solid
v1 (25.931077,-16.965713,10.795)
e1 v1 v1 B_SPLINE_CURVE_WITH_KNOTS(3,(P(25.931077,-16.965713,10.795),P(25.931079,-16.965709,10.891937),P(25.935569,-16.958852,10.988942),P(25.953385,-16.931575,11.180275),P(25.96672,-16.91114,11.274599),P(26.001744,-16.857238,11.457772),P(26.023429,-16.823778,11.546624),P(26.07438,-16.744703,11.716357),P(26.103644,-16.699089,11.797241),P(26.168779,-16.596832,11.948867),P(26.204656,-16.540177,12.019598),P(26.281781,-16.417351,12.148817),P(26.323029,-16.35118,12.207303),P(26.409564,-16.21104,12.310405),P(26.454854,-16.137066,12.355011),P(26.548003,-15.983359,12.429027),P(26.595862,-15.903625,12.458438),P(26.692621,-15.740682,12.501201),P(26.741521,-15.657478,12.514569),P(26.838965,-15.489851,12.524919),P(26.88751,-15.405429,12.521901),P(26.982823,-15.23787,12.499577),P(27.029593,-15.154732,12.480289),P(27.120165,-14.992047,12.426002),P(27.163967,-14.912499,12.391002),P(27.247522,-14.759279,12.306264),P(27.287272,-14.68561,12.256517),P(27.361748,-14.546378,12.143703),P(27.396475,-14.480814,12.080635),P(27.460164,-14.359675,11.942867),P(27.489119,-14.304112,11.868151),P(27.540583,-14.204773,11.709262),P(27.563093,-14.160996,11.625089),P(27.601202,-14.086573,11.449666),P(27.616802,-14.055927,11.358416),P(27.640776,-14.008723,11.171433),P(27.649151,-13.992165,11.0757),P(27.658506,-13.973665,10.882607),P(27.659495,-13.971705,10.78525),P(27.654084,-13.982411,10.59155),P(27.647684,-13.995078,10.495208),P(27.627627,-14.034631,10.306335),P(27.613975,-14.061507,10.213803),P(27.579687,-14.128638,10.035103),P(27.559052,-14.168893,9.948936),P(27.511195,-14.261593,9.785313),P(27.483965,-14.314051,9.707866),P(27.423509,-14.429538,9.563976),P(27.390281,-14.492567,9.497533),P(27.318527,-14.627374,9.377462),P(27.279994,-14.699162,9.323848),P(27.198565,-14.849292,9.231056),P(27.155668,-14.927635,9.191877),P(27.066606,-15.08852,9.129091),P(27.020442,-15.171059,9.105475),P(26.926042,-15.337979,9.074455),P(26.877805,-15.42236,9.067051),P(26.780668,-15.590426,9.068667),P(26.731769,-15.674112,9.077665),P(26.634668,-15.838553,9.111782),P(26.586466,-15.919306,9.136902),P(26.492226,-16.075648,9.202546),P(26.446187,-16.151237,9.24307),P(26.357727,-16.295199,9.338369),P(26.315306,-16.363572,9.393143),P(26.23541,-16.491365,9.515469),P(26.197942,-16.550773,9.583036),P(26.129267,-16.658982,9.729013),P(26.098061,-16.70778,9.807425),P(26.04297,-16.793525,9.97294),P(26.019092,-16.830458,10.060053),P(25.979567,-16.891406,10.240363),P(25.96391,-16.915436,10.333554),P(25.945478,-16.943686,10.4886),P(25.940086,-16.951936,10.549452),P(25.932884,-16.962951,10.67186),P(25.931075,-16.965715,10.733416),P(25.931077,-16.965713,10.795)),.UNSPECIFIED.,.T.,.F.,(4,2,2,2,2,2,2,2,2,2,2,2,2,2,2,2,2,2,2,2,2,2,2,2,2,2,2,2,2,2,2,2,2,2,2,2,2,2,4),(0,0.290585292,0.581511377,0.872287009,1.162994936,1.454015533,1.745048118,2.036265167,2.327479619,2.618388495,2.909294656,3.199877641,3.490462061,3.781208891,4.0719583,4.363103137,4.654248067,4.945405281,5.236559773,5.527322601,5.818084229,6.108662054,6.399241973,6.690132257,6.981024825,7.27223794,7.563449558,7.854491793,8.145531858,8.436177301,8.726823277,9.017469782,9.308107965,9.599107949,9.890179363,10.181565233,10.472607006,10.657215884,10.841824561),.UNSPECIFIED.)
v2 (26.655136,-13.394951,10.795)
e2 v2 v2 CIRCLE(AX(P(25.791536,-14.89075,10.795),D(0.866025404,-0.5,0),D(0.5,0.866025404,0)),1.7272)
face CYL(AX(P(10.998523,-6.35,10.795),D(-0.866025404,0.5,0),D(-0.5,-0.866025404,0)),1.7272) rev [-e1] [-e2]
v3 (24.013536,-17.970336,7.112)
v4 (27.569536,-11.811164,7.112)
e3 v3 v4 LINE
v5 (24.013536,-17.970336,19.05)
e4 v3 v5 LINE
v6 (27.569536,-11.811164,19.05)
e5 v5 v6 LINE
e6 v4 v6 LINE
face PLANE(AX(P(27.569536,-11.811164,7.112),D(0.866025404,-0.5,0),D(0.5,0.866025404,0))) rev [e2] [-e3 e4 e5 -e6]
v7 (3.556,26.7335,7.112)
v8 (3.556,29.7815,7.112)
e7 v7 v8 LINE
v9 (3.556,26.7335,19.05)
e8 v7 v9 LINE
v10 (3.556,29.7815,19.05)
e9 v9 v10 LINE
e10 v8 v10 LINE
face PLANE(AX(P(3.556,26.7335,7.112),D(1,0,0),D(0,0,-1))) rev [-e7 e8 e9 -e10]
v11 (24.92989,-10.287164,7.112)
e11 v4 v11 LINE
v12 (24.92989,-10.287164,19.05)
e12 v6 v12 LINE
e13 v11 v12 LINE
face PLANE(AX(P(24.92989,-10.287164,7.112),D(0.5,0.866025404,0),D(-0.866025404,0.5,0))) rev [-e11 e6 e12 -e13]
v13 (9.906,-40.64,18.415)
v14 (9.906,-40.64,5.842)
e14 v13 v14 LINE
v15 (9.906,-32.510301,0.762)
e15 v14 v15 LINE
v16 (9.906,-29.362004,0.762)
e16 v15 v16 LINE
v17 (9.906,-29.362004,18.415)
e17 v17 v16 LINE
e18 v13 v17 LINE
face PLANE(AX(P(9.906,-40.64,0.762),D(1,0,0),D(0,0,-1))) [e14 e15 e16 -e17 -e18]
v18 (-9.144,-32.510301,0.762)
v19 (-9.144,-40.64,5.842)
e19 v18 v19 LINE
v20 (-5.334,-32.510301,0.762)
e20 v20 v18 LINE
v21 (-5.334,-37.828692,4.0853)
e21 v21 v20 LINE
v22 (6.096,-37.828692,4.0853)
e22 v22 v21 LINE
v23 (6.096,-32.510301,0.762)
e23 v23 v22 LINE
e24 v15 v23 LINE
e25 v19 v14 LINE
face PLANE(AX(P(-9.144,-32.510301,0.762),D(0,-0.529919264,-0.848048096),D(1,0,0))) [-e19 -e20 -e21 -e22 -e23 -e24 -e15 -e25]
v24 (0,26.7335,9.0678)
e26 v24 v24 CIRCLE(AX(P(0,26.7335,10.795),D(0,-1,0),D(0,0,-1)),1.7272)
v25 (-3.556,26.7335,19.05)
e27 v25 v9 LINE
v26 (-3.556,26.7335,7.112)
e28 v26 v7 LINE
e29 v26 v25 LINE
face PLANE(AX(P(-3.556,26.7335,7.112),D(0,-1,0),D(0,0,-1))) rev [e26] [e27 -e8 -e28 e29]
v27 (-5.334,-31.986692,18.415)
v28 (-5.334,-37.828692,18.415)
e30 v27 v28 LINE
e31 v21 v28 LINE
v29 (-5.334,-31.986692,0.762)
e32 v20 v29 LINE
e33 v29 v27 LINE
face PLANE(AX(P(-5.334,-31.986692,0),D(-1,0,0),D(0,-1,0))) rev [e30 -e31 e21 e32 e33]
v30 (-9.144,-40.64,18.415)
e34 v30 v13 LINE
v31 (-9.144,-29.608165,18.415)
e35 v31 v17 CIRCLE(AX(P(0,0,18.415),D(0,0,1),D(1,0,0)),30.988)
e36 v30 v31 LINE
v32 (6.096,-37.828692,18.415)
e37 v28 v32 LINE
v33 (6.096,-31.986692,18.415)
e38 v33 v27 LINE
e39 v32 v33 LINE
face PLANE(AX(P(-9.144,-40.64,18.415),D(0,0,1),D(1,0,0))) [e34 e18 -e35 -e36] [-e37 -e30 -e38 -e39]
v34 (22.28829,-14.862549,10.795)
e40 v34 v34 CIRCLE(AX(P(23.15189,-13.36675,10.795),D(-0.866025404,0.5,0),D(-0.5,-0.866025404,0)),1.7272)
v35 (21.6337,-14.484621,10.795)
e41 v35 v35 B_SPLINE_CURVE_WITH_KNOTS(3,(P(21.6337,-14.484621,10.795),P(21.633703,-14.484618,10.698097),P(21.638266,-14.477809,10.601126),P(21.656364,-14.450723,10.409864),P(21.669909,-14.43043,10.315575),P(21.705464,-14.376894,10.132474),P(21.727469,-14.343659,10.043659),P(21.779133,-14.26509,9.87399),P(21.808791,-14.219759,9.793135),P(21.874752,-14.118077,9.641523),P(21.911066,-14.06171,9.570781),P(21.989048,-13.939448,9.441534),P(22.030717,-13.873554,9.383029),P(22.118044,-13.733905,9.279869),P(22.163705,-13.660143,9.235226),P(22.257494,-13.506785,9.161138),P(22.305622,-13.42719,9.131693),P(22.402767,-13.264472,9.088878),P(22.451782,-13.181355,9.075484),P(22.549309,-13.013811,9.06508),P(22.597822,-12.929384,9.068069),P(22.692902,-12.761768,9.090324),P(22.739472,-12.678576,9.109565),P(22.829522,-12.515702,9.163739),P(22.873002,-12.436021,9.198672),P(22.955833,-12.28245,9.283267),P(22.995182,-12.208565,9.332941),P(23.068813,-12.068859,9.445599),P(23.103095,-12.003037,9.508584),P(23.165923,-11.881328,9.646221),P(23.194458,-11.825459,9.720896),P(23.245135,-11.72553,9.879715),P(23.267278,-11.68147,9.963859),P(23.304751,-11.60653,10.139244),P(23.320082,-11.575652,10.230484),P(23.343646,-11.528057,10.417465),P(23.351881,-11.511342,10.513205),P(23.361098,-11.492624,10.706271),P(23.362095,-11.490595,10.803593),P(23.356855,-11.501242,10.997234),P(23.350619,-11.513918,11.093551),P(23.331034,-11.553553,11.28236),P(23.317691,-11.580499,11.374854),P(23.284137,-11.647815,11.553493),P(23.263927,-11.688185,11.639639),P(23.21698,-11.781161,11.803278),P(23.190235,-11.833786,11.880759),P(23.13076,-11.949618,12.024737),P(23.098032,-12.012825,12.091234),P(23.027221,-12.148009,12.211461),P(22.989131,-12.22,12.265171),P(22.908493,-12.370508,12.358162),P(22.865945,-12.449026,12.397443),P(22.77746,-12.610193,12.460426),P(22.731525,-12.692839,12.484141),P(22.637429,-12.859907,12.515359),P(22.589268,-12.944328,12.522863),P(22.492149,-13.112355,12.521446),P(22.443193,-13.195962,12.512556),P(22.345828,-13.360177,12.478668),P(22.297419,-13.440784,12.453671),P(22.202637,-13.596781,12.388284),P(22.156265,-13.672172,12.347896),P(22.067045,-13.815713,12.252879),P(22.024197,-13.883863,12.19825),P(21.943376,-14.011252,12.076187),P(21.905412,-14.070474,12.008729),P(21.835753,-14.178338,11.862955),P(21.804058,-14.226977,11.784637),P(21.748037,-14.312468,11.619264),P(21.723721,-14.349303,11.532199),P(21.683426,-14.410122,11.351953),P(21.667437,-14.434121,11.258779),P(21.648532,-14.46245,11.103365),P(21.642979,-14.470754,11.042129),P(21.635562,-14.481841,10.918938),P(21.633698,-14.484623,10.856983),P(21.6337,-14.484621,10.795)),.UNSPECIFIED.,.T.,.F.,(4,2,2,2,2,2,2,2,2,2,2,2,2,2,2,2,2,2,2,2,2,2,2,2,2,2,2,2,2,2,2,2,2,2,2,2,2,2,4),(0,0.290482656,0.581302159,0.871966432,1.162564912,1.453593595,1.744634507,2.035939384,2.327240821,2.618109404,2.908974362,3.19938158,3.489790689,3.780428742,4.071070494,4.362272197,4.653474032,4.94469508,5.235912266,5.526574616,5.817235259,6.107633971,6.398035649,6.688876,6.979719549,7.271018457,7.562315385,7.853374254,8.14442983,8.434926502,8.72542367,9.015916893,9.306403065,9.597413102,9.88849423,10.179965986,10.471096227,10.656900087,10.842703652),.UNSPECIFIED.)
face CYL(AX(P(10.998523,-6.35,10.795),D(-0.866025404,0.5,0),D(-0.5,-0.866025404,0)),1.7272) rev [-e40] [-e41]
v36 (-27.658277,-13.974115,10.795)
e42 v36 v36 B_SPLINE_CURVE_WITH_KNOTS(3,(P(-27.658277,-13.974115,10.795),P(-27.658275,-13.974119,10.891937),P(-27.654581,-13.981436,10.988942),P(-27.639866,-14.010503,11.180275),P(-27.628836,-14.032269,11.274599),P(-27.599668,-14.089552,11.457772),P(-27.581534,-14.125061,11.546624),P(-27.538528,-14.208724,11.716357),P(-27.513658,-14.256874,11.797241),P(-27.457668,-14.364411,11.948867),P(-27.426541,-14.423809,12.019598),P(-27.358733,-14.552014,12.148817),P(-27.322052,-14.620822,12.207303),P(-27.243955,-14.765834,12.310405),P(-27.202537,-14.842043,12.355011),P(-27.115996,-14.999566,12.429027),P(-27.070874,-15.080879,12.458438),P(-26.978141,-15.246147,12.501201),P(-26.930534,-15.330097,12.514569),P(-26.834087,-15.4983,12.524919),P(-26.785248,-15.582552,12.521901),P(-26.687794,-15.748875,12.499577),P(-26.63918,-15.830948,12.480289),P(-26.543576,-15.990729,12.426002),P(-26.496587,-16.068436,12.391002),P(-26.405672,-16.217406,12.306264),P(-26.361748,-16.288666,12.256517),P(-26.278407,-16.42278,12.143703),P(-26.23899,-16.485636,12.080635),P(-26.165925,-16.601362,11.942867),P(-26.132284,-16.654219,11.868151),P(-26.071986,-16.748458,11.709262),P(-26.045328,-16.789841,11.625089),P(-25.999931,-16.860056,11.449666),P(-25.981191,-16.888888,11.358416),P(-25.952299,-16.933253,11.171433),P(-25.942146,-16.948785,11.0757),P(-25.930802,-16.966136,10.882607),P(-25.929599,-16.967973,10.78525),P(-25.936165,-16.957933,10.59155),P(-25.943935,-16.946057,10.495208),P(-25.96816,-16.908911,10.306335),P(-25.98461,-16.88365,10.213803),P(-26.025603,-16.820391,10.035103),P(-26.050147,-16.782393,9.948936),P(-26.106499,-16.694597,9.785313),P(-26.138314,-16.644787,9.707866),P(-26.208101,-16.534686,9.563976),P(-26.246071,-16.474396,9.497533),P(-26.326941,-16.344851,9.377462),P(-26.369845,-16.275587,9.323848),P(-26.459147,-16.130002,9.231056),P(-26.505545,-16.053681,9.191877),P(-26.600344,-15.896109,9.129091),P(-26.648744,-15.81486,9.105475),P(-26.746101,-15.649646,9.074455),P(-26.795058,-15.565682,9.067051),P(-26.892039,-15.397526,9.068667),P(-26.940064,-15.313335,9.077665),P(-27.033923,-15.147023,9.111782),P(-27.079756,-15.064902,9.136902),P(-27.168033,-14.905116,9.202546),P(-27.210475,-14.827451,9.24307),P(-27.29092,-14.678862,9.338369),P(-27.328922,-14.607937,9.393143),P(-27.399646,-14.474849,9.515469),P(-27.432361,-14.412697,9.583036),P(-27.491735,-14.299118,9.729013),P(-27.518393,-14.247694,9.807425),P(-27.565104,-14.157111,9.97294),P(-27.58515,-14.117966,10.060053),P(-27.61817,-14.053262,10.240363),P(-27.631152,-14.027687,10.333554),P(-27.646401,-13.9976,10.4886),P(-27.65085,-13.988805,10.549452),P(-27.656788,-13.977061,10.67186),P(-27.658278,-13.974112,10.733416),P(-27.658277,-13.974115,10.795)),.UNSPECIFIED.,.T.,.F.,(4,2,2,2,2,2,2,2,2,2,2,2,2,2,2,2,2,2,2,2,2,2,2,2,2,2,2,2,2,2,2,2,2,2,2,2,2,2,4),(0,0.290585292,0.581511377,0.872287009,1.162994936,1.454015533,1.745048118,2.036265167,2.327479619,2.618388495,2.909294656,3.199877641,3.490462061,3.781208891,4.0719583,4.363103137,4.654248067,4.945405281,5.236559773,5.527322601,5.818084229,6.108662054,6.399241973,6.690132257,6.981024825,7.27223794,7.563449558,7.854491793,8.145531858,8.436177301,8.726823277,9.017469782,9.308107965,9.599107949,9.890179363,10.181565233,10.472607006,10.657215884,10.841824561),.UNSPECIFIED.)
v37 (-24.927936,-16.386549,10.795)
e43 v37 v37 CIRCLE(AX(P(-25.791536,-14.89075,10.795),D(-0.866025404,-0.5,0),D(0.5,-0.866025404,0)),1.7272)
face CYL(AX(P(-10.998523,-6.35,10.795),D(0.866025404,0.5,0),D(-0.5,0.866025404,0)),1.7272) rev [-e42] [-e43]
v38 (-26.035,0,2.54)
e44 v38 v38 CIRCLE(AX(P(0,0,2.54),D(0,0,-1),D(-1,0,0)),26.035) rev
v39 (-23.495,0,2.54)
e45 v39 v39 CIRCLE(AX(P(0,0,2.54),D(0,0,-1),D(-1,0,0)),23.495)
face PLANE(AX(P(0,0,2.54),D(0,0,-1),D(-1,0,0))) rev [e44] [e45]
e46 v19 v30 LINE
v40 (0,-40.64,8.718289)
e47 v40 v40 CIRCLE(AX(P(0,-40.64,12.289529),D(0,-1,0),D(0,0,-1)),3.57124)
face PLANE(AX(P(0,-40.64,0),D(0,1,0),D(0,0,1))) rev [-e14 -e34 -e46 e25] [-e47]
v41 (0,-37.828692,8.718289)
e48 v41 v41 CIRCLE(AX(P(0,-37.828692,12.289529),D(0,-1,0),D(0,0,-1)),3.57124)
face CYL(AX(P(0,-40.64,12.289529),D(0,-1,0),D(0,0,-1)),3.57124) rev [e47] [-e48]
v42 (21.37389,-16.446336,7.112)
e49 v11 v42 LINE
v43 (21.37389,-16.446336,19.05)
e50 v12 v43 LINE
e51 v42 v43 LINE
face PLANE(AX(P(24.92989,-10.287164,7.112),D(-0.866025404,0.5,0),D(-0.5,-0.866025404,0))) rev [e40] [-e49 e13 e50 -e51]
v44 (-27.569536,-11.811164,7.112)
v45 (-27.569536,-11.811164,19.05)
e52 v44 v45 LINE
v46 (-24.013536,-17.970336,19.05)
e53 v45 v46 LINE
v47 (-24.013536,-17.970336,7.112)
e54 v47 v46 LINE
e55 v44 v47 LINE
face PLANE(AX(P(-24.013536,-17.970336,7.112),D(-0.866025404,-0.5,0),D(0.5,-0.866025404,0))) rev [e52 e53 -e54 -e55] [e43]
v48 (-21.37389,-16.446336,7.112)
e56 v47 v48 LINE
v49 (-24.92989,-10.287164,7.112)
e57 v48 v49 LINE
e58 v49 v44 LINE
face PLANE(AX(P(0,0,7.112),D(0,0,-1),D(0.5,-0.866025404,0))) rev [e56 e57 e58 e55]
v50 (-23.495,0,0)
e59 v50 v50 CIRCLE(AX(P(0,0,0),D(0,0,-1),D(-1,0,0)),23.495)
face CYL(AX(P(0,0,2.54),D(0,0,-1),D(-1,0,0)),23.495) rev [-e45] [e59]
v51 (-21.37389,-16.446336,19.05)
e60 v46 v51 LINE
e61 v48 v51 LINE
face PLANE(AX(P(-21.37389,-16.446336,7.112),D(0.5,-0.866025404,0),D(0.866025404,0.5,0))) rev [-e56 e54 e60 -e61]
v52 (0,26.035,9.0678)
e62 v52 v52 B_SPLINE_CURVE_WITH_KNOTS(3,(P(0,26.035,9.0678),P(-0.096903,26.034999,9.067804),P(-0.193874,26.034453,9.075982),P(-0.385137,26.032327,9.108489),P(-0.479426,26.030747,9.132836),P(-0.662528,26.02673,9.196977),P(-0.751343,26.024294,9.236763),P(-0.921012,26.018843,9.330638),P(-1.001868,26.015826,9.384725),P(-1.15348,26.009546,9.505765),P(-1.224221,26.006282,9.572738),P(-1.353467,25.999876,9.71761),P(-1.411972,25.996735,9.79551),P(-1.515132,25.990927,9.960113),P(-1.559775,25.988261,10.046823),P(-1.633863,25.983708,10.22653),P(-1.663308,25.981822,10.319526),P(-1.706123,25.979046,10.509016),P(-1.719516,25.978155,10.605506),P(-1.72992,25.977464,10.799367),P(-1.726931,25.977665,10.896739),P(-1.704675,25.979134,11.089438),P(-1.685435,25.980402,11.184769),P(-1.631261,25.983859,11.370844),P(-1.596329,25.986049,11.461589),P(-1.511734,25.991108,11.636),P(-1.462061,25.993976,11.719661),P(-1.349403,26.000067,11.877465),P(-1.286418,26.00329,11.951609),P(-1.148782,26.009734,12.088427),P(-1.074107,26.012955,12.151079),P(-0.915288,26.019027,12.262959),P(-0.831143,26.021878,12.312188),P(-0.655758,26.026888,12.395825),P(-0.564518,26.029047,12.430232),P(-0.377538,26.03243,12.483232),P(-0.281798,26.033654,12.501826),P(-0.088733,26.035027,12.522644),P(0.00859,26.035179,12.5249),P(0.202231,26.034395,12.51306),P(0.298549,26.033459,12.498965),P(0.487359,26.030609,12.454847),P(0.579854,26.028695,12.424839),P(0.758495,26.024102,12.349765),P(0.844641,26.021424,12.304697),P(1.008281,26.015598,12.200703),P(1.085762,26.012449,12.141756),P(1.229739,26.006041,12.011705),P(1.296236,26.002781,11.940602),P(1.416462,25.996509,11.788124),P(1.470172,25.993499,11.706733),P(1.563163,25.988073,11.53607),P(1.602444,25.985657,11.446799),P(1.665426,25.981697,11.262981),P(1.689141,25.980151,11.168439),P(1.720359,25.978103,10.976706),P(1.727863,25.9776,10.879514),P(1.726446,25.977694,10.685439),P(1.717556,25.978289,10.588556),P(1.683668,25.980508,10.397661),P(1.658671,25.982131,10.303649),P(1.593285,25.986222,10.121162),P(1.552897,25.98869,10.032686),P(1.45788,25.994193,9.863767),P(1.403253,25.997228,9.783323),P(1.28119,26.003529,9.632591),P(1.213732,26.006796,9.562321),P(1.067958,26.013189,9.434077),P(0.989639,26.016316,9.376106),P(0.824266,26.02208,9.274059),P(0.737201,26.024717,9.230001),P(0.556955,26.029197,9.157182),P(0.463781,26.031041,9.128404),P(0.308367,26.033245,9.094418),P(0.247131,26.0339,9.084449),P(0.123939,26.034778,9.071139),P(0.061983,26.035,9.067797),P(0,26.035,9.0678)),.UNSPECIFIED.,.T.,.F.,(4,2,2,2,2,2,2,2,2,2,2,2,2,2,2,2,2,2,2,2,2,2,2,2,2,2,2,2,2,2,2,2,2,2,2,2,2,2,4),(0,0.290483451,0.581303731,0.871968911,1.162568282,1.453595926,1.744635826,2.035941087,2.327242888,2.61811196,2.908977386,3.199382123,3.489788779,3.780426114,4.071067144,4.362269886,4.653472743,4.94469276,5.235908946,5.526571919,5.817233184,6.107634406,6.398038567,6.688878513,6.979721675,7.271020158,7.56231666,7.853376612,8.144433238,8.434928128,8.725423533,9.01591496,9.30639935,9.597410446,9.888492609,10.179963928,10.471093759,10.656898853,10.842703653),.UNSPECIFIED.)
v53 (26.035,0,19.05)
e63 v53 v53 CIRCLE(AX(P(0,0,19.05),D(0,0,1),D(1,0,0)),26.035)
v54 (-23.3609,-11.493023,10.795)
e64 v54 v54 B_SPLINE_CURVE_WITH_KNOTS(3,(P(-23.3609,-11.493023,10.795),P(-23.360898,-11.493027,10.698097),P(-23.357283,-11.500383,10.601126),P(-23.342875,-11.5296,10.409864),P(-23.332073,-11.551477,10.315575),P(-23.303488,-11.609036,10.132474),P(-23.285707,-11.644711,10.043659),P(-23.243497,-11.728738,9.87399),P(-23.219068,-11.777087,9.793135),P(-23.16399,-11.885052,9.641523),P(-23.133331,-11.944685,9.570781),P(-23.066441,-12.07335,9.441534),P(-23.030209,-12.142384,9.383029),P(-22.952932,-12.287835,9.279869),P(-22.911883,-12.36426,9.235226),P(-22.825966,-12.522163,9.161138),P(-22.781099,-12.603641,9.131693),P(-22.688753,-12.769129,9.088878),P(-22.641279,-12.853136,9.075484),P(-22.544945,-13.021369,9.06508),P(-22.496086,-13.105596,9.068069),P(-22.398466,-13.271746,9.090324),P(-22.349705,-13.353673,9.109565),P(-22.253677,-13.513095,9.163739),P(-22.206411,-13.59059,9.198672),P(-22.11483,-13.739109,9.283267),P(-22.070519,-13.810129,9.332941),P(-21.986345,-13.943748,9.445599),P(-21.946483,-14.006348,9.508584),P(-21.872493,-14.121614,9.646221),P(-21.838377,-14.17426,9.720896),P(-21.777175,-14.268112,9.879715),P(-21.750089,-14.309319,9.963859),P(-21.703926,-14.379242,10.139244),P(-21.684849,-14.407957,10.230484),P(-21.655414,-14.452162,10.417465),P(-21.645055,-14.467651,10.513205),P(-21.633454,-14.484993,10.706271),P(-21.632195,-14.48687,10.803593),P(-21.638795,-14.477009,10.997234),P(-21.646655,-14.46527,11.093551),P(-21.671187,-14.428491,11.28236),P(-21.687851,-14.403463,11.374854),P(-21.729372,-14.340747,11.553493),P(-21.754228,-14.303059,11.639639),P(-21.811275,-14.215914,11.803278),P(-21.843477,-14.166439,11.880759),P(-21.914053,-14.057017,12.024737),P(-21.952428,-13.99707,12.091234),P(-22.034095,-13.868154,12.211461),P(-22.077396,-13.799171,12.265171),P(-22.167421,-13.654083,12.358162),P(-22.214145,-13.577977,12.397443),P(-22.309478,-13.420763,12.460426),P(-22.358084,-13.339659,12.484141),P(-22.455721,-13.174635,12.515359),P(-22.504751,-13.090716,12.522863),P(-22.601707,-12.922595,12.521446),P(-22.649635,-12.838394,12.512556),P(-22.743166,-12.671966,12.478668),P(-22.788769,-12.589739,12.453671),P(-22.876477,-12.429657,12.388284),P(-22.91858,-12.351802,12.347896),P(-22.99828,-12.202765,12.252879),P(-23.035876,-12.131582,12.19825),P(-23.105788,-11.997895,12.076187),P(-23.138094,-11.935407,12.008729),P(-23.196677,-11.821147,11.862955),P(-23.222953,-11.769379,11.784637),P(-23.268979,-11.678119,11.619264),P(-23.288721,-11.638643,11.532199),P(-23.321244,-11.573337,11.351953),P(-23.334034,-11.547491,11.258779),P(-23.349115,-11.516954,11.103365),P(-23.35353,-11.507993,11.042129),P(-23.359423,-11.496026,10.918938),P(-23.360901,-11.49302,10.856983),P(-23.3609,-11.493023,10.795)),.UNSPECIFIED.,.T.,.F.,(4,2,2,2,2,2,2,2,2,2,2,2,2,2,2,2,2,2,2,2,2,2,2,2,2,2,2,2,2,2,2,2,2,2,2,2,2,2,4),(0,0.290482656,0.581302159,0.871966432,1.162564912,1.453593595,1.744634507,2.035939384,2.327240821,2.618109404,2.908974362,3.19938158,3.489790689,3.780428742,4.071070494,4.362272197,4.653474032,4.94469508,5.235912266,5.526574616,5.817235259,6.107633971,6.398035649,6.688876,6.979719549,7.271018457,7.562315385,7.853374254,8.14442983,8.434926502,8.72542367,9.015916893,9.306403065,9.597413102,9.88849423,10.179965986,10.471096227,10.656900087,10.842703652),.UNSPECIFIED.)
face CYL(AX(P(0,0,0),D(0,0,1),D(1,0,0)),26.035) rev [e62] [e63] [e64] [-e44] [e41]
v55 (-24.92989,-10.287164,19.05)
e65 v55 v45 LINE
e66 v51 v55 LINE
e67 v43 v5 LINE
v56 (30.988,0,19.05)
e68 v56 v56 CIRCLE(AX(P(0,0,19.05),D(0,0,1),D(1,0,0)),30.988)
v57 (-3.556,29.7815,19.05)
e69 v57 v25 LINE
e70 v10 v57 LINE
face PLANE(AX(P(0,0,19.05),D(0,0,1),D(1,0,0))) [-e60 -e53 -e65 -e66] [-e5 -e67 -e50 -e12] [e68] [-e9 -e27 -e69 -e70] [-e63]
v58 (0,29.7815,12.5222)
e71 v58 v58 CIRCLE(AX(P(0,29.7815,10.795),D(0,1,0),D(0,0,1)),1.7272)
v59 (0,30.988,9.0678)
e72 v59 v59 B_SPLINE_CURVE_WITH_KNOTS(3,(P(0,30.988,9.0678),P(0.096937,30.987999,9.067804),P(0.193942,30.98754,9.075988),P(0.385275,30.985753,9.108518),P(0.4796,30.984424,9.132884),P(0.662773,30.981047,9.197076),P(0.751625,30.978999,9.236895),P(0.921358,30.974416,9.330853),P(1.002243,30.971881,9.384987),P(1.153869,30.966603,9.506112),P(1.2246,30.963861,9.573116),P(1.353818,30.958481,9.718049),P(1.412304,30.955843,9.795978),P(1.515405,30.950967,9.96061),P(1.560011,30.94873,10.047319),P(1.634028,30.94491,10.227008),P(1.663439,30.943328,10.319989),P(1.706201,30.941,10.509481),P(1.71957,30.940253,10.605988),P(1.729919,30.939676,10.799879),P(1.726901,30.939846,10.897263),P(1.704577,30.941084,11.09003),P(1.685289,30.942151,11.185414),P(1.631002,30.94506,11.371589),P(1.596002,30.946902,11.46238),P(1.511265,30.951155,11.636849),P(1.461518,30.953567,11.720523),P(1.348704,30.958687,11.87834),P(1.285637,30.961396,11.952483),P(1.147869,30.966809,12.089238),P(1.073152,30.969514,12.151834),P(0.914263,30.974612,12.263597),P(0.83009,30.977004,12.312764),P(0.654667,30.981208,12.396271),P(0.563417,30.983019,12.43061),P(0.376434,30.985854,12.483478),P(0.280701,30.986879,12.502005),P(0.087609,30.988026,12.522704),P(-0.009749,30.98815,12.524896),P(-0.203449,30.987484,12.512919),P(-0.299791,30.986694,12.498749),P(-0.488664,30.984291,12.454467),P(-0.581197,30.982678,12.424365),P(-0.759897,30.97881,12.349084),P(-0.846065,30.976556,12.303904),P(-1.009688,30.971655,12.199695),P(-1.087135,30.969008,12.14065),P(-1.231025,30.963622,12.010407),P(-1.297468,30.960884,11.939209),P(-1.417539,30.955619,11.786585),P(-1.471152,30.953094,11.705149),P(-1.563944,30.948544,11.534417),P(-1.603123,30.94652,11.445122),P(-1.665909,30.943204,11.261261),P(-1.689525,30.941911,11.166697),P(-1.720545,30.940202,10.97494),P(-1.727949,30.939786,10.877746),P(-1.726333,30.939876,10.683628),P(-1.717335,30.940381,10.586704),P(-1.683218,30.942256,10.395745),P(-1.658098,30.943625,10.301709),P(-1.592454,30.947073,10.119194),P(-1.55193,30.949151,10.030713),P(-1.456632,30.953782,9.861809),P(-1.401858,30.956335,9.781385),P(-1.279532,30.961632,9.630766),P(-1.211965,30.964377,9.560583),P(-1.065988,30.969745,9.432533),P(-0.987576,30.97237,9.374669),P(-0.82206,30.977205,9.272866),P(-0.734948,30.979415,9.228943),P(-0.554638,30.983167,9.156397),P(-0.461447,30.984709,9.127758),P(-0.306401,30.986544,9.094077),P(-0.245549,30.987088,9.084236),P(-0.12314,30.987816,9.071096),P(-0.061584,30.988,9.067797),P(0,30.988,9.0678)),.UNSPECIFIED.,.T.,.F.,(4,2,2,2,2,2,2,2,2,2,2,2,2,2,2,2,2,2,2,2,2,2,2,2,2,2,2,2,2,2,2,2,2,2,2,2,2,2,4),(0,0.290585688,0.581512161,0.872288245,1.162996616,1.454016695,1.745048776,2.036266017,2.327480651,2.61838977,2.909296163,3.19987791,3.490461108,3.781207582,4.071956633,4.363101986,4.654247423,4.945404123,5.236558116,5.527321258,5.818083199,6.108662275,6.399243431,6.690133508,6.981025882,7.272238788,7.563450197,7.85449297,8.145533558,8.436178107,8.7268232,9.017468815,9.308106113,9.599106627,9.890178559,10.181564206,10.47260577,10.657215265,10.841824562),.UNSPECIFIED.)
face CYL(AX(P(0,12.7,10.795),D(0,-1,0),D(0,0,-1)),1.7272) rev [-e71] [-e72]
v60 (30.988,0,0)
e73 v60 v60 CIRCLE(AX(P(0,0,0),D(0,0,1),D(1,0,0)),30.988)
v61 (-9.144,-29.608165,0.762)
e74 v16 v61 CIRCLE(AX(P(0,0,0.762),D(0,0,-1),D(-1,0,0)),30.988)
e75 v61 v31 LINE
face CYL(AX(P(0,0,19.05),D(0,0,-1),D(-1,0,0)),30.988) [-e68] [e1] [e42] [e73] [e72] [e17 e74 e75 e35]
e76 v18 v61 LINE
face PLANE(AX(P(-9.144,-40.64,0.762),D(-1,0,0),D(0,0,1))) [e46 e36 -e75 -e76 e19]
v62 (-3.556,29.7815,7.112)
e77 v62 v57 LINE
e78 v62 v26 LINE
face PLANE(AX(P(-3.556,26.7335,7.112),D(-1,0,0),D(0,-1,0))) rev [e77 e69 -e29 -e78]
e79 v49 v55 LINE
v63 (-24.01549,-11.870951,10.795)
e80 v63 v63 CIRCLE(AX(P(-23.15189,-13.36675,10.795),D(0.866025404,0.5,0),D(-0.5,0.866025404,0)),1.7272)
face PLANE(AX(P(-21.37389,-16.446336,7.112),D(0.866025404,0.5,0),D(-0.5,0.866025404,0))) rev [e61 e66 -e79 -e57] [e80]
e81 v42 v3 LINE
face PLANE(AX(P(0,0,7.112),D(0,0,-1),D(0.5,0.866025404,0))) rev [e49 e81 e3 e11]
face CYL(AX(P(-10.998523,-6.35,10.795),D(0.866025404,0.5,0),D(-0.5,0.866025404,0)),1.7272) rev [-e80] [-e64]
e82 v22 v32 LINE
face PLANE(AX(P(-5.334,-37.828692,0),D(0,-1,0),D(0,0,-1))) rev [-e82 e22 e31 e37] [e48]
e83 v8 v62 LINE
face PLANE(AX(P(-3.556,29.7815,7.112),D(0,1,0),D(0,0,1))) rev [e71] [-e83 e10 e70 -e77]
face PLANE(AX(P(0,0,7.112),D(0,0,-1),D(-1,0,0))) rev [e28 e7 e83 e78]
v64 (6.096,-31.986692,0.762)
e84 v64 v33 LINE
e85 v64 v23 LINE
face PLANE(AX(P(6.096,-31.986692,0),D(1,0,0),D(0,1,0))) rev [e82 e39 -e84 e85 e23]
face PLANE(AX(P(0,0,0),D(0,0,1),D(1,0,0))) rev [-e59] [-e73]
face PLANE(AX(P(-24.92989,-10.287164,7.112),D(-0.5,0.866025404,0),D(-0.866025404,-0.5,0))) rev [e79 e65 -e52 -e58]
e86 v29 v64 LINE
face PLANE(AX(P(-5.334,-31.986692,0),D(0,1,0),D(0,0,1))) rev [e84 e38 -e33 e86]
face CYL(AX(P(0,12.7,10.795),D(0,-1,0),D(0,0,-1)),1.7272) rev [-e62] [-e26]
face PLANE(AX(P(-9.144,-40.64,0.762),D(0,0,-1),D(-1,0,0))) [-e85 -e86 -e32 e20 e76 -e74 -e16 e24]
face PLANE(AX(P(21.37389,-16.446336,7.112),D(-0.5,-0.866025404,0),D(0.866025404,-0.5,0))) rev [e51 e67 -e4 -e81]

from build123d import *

# Parameters (mm, degrees)
SKETCH1_R                   = 30.988
BOSS_EXTRUDE1_DEPTH         = 19.05
SKETCH2_R                   = 26.035
CUT_EXTRUDE1_DEPTH          = 48.785089599
BOSS_EXTRUDE2_START         = -2.54
SKETCH4_R                   = 26.035
SKETCH4_R_2                 = 23.495
BOSS_EXTRUDE2_DEPTH         = 2.54
SKETCH11_W                  = 7.112
SKETCH11_H                  = 3.048
CUT_EXTRUDE3_DEPTH          = 11.938
CIRPATTERN2_COUNT           = 3
F_4_CLEARANCE_HOLE1_D       = 3.4544
F_4_CLEARANCE_HOLE1_DEPTH   = 34.456395212
SKETCH15_W                  = 19.05
SKETCH15_H                  = 17.653
BOSS_EXTRUDE3_DEPTH         = 12.7
CIRPATTERN3_COUNT           = 3
SKETCH16_W                  = 11.43
SKETCH16_H                  = 5.842
CUT_EXTRUDE4_DEPTH          = 55.322904735
CHAMFER2_SIZE               = 8.129699408
CHAMFER2_SIZE_2             = 5.08
F_1_4_CLEARANCE_HOLE1_D     = 7.14248
F_1_4_CLEARANCE_HOLE1_DEPTH = 2.811307748


with BuildPart() as part:
    # Sketch1 → Boss-Extrude1 (new body)
    with BuildSketch(Plane.XY):
        with Locations(Location((0, 0, 0), (0, 0, 180))):
            Circle(SKETCH1_R)
    extrude(amount=BOSS_EXTRUDE1_DEPTH)

    # Sketch2 → Cut-Extrude1 (cut, through all)
    with BuildSketch(Plane.XY.offset(19.05)):
        Circle(SKETCH2_R)
    extrude(amount=-CUT_EXTRUDE1_DEPTH, mode=Mode.SUBTRACT)

    # Sketch4 → Boss-Extrude2 (add)
    with BuildSketch(Plane(origin=(0, 0, 0), x_dir=(-1, 0, 0), z_dir=(0, 0, -1)).offset(BOSS_EXTRUDE2_START)):
        with Locations(Location((0, 0, 0), (0, 0, 180))):
            Circle(SKETCH4_R)
        Circle(SKETCH4_R_2, mode=Mode.SUBTRACT)
    extrude(amount=BOSS_EXTRUDE2_DEPTH)

    # Sketch11 → Cut-Extrude3 (cut)
    with BuildSketch(Plane.XY.offset(19.05)):
        with Locations((0, 28.2575)):
            Rectangle(SKETCH11_W, SKETCH11_H)
    cut_extrude3 = extrude(amount=-CUT_EXTRUDE3_DEPTH, mode=Mode.SUBTRACT)

    # CirPattern2: Cut-Extrude3 ×3 about axis
    cirpattern2_axis = Axis((0, 0, 0), (0, 0, 1))
    for i in range(1, CIRPATTERN2_COUNT):
        add(cut_extrude3.rotate(cirpattern2_axis, i * 360 / CIRPATTERN2_COUNT), mode=Mode.SUBTRACT)

    # #4 Clearance Hole1
    with Locations(Plane.XZ.offset(-12.7)):
        with Locations((0, 10.795)):
            f_4_clearance_hole1 = Hole(F_4_CLEARANCE_HOLE1_D / 2, depth=F_4_CLEARANCE_HOLE1_DEPTH)

    # Sketch15 → Boss-Extrude3 (add)
    with BuildSketch(Plane(origin=(0, -27.94, 0), x_dir=(1, 0, 0), z_dir=(0, 1, 0))):
        with Locations((0.381, -9.5885)):
            Rectangle(SKETCH15_W, SKETCH15_H)
    extrude(amount=-BOSS_EXTRUDE3_DEPTH)

    # CirPattern3: #4 Clearance Hole1 ×3 about axis
    cirpattern3_axis = Axis((0, 0, 19.05), (0, 0, 1))
    for i in range(1, CIRPATTERN3_COUNT):
        add(f_4_clearance_hole1.rotate(cirpattern3_axis, i * 360 / CIRPATTERN3_COUNT), mode=Mode.SUBTRACT)

    # Sketch16 → Cut-Extrude4 (cut, through all)
    with BuildSketch(Plane.XY.offset(18.415)):
        with Locations((0.381, -34.907692252)):
            Rectangle(SKETCH16_W, SKETCH16_H)
    extrude(amount=-CUT_EXTRUDE4_DEPTH, mode=Mode.SUBTRACT)

    # Chamfer2
    # the kernel refuses this chamfer: 8.129699408, 5.08 mm, written as the material it takes off along each edge
    with BuildSketch(Plane(origin=(-30.162101737, -40.64, 0.762), x_dir=(0, 0.9997899140358644, -0.020497019104217945), z_dir=(1, 0, 0))) as chamfer2_piece_1:
        Polygon((CHAMFER2_SIZE * 0.999789913978, CHAMFER2_SIZE * 0.020497019103), (-CHAMFER2_SIZE_2 * 0.0204970191042, CHAMFER2_SIZE_2 * 0.999789914036), (0, 0), align=None)
    extrude(amount=61.086203475, mode=Mode.SUBTRACT)

    # 1/4 Clearance Hole1
    with Locations(Plane(origin=(0, -40.64, 0), x_dir=(-1, 0, 0), z_dir=(0, -1, 0))):
        with Locations((0, -12.289529053)):
            Hole(F_1_4_CLEARANCE_HOLE1_D / 2, depth=F_1_4_CLEARANCE_HOLE1_DEPTH)


solid = part.part
